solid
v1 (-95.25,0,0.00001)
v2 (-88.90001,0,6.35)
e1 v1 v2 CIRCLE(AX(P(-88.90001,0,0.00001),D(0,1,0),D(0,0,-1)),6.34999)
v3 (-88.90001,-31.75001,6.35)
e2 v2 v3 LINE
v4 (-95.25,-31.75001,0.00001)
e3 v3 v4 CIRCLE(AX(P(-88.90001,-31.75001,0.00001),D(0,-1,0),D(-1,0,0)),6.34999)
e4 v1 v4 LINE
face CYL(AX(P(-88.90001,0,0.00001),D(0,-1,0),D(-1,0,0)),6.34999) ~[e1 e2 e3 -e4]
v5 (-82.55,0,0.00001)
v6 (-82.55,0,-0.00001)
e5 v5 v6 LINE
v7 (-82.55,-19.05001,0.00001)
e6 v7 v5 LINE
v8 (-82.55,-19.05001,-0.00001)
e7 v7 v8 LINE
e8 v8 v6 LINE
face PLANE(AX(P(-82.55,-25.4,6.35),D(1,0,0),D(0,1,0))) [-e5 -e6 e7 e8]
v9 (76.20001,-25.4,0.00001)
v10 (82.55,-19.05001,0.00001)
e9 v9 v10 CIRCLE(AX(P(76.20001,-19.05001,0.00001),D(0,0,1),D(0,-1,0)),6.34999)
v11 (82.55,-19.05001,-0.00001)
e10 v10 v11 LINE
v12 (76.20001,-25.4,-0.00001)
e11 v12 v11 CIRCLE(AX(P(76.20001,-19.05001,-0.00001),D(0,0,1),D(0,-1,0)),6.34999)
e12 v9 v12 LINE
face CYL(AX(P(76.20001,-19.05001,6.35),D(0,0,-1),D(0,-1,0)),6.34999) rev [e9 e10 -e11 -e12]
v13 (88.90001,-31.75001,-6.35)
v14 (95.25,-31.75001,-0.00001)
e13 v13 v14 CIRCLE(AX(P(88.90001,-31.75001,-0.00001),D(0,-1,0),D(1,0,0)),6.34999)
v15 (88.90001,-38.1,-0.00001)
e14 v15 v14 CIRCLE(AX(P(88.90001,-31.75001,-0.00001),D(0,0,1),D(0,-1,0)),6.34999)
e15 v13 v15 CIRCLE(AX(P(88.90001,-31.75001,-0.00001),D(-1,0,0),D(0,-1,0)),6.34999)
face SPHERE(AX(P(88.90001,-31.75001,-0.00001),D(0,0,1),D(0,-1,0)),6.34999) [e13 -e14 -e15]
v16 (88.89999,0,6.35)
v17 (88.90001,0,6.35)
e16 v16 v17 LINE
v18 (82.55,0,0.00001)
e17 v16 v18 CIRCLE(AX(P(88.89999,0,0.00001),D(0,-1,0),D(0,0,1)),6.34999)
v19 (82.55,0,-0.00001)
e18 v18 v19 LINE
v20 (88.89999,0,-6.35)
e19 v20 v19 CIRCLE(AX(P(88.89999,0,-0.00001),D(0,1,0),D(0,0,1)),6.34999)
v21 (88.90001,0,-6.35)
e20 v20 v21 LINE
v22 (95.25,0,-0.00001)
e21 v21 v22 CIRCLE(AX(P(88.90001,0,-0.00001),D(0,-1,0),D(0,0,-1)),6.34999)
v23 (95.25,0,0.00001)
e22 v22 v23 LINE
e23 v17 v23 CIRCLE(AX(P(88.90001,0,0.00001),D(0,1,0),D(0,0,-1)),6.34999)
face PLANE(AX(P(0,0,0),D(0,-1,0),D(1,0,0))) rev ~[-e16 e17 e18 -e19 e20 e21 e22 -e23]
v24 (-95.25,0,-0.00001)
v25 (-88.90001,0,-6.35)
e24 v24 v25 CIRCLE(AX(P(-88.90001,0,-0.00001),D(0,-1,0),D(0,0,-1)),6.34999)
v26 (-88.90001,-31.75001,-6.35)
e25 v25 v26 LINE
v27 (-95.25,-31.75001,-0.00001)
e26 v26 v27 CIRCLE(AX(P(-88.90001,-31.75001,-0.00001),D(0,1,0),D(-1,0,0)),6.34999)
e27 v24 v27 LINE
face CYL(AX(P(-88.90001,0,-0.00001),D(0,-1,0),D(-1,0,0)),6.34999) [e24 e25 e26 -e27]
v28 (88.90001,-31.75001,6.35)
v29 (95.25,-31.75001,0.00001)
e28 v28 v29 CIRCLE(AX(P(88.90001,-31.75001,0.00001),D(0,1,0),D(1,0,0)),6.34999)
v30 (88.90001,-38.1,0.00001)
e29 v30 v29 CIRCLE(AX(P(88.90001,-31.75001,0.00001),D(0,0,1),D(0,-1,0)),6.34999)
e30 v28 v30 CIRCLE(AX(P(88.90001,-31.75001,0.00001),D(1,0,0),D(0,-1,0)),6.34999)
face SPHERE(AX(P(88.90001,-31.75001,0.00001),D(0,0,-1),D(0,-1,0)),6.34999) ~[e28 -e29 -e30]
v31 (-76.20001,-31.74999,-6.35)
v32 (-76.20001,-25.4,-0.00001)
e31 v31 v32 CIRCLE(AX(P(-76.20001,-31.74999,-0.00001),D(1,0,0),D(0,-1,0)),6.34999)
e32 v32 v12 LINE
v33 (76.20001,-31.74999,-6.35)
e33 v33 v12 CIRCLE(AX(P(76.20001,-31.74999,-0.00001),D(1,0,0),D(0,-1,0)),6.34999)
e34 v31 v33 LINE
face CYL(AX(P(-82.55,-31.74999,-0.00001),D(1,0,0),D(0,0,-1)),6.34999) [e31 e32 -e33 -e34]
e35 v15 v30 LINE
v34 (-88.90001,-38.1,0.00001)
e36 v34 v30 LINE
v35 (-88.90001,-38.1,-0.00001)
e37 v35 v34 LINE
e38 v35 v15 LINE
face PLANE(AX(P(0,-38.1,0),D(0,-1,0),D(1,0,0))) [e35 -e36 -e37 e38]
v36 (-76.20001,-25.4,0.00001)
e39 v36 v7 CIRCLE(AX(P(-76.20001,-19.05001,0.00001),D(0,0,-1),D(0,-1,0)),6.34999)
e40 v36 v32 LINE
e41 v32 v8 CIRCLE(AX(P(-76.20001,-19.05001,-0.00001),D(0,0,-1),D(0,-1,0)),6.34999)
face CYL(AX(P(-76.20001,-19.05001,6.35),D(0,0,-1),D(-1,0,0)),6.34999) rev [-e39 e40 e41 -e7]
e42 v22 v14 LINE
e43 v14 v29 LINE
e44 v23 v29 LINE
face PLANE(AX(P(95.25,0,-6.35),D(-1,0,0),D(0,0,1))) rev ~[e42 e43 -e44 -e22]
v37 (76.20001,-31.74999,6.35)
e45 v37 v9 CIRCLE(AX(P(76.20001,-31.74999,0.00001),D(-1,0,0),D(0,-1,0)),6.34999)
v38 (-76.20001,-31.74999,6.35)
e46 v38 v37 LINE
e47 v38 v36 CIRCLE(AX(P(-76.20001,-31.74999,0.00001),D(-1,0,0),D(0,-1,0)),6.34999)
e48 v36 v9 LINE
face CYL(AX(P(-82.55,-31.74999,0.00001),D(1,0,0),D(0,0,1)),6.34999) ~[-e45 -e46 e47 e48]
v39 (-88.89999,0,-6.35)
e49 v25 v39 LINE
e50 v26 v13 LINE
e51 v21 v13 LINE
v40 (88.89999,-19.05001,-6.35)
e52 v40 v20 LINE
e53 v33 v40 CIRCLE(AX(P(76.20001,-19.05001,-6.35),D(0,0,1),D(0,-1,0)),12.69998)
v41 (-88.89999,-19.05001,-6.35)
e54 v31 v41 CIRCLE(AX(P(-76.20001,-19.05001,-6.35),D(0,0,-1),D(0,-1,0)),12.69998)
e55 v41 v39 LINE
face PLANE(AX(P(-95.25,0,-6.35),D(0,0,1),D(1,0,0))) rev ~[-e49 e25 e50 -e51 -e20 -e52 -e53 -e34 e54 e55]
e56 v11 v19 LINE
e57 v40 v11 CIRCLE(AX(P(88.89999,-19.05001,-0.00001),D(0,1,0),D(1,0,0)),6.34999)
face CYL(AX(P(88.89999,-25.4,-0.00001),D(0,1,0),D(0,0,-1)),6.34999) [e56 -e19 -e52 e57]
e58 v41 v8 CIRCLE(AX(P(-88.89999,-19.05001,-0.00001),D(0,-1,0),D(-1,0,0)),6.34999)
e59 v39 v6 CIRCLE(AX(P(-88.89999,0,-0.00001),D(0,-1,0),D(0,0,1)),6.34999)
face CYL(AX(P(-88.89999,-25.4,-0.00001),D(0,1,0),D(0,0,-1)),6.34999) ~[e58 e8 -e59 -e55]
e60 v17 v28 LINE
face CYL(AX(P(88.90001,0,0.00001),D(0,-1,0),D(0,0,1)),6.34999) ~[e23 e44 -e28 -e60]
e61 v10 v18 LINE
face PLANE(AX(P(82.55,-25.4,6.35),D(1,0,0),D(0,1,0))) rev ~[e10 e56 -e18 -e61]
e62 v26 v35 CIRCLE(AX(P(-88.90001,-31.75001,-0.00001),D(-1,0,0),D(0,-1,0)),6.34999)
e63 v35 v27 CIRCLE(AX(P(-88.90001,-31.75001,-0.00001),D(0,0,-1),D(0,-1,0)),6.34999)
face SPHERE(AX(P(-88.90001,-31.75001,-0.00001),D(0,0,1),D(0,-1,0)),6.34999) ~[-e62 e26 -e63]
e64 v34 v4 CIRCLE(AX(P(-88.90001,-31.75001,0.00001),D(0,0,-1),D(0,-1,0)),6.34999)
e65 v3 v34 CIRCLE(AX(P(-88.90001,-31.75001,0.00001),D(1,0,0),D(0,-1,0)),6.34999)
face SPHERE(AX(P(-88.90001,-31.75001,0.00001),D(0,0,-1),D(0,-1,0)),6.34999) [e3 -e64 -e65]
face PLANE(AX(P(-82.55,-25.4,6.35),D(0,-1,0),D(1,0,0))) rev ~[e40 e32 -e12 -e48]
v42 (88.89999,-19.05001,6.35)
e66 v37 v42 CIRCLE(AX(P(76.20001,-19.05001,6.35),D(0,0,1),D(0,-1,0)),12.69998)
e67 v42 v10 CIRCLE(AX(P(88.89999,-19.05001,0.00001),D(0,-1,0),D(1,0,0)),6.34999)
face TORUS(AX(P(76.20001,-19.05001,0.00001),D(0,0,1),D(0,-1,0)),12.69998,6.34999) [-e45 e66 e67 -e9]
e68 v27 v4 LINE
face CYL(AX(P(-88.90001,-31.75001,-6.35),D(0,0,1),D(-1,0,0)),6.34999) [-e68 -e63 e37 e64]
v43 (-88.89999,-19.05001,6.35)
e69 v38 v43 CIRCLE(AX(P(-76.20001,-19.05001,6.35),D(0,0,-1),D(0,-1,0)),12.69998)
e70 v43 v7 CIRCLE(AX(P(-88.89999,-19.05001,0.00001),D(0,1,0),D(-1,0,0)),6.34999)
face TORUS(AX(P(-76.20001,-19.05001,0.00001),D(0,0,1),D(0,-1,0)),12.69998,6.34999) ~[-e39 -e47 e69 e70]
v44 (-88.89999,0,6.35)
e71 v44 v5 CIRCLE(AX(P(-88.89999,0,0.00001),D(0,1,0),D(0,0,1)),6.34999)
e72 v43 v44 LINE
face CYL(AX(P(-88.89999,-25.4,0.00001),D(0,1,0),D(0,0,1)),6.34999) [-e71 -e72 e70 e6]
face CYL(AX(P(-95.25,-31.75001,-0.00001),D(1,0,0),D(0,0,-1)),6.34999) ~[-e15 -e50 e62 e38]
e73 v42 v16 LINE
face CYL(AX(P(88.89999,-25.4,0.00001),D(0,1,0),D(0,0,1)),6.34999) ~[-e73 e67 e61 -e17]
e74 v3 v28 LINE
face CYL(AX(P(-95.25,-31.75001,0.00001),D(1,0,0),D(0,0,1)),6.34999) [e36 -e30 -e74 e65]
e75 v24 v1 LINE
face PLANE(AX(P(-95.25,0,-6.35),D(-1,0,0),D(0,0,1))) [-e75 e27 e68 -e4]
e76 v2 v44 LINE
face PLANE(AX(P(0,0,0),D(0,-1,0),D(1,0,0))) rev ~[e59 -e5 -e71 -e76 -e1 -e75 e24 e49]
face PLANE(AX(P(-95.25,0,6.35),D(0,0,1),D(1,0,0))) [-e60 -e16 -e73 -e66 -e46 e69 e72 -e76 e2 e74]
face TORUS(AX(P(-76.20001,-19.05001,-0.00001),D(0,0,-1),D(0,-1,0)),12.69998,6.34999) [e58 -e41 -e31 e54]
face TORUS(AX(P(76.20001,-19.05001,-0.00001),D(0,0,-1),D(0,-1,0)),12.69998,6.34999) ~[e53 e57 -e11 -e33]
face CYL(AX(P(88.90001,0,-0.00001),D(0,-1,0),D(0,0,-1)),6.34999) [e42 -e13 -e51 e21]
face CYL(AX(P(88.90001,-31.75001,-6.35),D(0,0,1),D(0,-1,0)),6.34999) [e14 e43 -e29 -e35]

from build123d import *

# Parameters (mm, degrees)
F0_W     = 190.5
F0_H     = 12.7
F1_DEPTH = 38.1
F2_W     = 165.1
F2_H     = 25.4
F3_DEPTH = 12.701
F4_R     = 6.34999


# Not quite as in the source:
# - a fillet or chamfer is up to 0.001 mm smaller than in the source, because OpenCascade refuses the exact size


with BuildPart() as f1:
    # F0 (on Front) → F1 (new body)
    with BuildSketch(Plane.XZ):
        Rectangle(F0_W, F0_H)
    extrude(amount=F1_DEPTH)

    # F2 (on face) → F3 (cut, through all)
    with BuildSketch(Plane.XY.offset(6.35)):
        with Locations((0, -12.7)):
            Rectangle(F2_W, F2_H)
    extrude(amount=-F3_DEPTH, mode=Mode.SUBTRACT)

    # F4 (radius 6.35 in the source; OpenCascade refuses exactly that, so slightly less here)
    f4_edges = [f1.edges().sort_by_distance(p)[0] for p in [
        (-95.25, -38.1, 0),
        (-82.55, -25.4, 0),
        (95.25, -38.1, 0),
        (82.55, -25.4, 0),
        (0, -38.1, 6.35),
        (0, -25.4, 6.35),
        (0, -38.1, -6.35),
        (0, -25.4, -6.35),
        (-82.55, -12.7, -6.35),
        (-95.25, -19.05, -6.35),
        (82.55, -12.7, -6.35),
        (95.25, -19.05, -6.35),
        (95.25, -19.05, 6.35),
        (-82.55, -12.7, 6.35),
        (-95.25, -19.05, 6.35),
        (82.55, -12.7, 6.35),
    ]]
    fillet(f4_edges, radius=F4_R)


solid = f1.part
